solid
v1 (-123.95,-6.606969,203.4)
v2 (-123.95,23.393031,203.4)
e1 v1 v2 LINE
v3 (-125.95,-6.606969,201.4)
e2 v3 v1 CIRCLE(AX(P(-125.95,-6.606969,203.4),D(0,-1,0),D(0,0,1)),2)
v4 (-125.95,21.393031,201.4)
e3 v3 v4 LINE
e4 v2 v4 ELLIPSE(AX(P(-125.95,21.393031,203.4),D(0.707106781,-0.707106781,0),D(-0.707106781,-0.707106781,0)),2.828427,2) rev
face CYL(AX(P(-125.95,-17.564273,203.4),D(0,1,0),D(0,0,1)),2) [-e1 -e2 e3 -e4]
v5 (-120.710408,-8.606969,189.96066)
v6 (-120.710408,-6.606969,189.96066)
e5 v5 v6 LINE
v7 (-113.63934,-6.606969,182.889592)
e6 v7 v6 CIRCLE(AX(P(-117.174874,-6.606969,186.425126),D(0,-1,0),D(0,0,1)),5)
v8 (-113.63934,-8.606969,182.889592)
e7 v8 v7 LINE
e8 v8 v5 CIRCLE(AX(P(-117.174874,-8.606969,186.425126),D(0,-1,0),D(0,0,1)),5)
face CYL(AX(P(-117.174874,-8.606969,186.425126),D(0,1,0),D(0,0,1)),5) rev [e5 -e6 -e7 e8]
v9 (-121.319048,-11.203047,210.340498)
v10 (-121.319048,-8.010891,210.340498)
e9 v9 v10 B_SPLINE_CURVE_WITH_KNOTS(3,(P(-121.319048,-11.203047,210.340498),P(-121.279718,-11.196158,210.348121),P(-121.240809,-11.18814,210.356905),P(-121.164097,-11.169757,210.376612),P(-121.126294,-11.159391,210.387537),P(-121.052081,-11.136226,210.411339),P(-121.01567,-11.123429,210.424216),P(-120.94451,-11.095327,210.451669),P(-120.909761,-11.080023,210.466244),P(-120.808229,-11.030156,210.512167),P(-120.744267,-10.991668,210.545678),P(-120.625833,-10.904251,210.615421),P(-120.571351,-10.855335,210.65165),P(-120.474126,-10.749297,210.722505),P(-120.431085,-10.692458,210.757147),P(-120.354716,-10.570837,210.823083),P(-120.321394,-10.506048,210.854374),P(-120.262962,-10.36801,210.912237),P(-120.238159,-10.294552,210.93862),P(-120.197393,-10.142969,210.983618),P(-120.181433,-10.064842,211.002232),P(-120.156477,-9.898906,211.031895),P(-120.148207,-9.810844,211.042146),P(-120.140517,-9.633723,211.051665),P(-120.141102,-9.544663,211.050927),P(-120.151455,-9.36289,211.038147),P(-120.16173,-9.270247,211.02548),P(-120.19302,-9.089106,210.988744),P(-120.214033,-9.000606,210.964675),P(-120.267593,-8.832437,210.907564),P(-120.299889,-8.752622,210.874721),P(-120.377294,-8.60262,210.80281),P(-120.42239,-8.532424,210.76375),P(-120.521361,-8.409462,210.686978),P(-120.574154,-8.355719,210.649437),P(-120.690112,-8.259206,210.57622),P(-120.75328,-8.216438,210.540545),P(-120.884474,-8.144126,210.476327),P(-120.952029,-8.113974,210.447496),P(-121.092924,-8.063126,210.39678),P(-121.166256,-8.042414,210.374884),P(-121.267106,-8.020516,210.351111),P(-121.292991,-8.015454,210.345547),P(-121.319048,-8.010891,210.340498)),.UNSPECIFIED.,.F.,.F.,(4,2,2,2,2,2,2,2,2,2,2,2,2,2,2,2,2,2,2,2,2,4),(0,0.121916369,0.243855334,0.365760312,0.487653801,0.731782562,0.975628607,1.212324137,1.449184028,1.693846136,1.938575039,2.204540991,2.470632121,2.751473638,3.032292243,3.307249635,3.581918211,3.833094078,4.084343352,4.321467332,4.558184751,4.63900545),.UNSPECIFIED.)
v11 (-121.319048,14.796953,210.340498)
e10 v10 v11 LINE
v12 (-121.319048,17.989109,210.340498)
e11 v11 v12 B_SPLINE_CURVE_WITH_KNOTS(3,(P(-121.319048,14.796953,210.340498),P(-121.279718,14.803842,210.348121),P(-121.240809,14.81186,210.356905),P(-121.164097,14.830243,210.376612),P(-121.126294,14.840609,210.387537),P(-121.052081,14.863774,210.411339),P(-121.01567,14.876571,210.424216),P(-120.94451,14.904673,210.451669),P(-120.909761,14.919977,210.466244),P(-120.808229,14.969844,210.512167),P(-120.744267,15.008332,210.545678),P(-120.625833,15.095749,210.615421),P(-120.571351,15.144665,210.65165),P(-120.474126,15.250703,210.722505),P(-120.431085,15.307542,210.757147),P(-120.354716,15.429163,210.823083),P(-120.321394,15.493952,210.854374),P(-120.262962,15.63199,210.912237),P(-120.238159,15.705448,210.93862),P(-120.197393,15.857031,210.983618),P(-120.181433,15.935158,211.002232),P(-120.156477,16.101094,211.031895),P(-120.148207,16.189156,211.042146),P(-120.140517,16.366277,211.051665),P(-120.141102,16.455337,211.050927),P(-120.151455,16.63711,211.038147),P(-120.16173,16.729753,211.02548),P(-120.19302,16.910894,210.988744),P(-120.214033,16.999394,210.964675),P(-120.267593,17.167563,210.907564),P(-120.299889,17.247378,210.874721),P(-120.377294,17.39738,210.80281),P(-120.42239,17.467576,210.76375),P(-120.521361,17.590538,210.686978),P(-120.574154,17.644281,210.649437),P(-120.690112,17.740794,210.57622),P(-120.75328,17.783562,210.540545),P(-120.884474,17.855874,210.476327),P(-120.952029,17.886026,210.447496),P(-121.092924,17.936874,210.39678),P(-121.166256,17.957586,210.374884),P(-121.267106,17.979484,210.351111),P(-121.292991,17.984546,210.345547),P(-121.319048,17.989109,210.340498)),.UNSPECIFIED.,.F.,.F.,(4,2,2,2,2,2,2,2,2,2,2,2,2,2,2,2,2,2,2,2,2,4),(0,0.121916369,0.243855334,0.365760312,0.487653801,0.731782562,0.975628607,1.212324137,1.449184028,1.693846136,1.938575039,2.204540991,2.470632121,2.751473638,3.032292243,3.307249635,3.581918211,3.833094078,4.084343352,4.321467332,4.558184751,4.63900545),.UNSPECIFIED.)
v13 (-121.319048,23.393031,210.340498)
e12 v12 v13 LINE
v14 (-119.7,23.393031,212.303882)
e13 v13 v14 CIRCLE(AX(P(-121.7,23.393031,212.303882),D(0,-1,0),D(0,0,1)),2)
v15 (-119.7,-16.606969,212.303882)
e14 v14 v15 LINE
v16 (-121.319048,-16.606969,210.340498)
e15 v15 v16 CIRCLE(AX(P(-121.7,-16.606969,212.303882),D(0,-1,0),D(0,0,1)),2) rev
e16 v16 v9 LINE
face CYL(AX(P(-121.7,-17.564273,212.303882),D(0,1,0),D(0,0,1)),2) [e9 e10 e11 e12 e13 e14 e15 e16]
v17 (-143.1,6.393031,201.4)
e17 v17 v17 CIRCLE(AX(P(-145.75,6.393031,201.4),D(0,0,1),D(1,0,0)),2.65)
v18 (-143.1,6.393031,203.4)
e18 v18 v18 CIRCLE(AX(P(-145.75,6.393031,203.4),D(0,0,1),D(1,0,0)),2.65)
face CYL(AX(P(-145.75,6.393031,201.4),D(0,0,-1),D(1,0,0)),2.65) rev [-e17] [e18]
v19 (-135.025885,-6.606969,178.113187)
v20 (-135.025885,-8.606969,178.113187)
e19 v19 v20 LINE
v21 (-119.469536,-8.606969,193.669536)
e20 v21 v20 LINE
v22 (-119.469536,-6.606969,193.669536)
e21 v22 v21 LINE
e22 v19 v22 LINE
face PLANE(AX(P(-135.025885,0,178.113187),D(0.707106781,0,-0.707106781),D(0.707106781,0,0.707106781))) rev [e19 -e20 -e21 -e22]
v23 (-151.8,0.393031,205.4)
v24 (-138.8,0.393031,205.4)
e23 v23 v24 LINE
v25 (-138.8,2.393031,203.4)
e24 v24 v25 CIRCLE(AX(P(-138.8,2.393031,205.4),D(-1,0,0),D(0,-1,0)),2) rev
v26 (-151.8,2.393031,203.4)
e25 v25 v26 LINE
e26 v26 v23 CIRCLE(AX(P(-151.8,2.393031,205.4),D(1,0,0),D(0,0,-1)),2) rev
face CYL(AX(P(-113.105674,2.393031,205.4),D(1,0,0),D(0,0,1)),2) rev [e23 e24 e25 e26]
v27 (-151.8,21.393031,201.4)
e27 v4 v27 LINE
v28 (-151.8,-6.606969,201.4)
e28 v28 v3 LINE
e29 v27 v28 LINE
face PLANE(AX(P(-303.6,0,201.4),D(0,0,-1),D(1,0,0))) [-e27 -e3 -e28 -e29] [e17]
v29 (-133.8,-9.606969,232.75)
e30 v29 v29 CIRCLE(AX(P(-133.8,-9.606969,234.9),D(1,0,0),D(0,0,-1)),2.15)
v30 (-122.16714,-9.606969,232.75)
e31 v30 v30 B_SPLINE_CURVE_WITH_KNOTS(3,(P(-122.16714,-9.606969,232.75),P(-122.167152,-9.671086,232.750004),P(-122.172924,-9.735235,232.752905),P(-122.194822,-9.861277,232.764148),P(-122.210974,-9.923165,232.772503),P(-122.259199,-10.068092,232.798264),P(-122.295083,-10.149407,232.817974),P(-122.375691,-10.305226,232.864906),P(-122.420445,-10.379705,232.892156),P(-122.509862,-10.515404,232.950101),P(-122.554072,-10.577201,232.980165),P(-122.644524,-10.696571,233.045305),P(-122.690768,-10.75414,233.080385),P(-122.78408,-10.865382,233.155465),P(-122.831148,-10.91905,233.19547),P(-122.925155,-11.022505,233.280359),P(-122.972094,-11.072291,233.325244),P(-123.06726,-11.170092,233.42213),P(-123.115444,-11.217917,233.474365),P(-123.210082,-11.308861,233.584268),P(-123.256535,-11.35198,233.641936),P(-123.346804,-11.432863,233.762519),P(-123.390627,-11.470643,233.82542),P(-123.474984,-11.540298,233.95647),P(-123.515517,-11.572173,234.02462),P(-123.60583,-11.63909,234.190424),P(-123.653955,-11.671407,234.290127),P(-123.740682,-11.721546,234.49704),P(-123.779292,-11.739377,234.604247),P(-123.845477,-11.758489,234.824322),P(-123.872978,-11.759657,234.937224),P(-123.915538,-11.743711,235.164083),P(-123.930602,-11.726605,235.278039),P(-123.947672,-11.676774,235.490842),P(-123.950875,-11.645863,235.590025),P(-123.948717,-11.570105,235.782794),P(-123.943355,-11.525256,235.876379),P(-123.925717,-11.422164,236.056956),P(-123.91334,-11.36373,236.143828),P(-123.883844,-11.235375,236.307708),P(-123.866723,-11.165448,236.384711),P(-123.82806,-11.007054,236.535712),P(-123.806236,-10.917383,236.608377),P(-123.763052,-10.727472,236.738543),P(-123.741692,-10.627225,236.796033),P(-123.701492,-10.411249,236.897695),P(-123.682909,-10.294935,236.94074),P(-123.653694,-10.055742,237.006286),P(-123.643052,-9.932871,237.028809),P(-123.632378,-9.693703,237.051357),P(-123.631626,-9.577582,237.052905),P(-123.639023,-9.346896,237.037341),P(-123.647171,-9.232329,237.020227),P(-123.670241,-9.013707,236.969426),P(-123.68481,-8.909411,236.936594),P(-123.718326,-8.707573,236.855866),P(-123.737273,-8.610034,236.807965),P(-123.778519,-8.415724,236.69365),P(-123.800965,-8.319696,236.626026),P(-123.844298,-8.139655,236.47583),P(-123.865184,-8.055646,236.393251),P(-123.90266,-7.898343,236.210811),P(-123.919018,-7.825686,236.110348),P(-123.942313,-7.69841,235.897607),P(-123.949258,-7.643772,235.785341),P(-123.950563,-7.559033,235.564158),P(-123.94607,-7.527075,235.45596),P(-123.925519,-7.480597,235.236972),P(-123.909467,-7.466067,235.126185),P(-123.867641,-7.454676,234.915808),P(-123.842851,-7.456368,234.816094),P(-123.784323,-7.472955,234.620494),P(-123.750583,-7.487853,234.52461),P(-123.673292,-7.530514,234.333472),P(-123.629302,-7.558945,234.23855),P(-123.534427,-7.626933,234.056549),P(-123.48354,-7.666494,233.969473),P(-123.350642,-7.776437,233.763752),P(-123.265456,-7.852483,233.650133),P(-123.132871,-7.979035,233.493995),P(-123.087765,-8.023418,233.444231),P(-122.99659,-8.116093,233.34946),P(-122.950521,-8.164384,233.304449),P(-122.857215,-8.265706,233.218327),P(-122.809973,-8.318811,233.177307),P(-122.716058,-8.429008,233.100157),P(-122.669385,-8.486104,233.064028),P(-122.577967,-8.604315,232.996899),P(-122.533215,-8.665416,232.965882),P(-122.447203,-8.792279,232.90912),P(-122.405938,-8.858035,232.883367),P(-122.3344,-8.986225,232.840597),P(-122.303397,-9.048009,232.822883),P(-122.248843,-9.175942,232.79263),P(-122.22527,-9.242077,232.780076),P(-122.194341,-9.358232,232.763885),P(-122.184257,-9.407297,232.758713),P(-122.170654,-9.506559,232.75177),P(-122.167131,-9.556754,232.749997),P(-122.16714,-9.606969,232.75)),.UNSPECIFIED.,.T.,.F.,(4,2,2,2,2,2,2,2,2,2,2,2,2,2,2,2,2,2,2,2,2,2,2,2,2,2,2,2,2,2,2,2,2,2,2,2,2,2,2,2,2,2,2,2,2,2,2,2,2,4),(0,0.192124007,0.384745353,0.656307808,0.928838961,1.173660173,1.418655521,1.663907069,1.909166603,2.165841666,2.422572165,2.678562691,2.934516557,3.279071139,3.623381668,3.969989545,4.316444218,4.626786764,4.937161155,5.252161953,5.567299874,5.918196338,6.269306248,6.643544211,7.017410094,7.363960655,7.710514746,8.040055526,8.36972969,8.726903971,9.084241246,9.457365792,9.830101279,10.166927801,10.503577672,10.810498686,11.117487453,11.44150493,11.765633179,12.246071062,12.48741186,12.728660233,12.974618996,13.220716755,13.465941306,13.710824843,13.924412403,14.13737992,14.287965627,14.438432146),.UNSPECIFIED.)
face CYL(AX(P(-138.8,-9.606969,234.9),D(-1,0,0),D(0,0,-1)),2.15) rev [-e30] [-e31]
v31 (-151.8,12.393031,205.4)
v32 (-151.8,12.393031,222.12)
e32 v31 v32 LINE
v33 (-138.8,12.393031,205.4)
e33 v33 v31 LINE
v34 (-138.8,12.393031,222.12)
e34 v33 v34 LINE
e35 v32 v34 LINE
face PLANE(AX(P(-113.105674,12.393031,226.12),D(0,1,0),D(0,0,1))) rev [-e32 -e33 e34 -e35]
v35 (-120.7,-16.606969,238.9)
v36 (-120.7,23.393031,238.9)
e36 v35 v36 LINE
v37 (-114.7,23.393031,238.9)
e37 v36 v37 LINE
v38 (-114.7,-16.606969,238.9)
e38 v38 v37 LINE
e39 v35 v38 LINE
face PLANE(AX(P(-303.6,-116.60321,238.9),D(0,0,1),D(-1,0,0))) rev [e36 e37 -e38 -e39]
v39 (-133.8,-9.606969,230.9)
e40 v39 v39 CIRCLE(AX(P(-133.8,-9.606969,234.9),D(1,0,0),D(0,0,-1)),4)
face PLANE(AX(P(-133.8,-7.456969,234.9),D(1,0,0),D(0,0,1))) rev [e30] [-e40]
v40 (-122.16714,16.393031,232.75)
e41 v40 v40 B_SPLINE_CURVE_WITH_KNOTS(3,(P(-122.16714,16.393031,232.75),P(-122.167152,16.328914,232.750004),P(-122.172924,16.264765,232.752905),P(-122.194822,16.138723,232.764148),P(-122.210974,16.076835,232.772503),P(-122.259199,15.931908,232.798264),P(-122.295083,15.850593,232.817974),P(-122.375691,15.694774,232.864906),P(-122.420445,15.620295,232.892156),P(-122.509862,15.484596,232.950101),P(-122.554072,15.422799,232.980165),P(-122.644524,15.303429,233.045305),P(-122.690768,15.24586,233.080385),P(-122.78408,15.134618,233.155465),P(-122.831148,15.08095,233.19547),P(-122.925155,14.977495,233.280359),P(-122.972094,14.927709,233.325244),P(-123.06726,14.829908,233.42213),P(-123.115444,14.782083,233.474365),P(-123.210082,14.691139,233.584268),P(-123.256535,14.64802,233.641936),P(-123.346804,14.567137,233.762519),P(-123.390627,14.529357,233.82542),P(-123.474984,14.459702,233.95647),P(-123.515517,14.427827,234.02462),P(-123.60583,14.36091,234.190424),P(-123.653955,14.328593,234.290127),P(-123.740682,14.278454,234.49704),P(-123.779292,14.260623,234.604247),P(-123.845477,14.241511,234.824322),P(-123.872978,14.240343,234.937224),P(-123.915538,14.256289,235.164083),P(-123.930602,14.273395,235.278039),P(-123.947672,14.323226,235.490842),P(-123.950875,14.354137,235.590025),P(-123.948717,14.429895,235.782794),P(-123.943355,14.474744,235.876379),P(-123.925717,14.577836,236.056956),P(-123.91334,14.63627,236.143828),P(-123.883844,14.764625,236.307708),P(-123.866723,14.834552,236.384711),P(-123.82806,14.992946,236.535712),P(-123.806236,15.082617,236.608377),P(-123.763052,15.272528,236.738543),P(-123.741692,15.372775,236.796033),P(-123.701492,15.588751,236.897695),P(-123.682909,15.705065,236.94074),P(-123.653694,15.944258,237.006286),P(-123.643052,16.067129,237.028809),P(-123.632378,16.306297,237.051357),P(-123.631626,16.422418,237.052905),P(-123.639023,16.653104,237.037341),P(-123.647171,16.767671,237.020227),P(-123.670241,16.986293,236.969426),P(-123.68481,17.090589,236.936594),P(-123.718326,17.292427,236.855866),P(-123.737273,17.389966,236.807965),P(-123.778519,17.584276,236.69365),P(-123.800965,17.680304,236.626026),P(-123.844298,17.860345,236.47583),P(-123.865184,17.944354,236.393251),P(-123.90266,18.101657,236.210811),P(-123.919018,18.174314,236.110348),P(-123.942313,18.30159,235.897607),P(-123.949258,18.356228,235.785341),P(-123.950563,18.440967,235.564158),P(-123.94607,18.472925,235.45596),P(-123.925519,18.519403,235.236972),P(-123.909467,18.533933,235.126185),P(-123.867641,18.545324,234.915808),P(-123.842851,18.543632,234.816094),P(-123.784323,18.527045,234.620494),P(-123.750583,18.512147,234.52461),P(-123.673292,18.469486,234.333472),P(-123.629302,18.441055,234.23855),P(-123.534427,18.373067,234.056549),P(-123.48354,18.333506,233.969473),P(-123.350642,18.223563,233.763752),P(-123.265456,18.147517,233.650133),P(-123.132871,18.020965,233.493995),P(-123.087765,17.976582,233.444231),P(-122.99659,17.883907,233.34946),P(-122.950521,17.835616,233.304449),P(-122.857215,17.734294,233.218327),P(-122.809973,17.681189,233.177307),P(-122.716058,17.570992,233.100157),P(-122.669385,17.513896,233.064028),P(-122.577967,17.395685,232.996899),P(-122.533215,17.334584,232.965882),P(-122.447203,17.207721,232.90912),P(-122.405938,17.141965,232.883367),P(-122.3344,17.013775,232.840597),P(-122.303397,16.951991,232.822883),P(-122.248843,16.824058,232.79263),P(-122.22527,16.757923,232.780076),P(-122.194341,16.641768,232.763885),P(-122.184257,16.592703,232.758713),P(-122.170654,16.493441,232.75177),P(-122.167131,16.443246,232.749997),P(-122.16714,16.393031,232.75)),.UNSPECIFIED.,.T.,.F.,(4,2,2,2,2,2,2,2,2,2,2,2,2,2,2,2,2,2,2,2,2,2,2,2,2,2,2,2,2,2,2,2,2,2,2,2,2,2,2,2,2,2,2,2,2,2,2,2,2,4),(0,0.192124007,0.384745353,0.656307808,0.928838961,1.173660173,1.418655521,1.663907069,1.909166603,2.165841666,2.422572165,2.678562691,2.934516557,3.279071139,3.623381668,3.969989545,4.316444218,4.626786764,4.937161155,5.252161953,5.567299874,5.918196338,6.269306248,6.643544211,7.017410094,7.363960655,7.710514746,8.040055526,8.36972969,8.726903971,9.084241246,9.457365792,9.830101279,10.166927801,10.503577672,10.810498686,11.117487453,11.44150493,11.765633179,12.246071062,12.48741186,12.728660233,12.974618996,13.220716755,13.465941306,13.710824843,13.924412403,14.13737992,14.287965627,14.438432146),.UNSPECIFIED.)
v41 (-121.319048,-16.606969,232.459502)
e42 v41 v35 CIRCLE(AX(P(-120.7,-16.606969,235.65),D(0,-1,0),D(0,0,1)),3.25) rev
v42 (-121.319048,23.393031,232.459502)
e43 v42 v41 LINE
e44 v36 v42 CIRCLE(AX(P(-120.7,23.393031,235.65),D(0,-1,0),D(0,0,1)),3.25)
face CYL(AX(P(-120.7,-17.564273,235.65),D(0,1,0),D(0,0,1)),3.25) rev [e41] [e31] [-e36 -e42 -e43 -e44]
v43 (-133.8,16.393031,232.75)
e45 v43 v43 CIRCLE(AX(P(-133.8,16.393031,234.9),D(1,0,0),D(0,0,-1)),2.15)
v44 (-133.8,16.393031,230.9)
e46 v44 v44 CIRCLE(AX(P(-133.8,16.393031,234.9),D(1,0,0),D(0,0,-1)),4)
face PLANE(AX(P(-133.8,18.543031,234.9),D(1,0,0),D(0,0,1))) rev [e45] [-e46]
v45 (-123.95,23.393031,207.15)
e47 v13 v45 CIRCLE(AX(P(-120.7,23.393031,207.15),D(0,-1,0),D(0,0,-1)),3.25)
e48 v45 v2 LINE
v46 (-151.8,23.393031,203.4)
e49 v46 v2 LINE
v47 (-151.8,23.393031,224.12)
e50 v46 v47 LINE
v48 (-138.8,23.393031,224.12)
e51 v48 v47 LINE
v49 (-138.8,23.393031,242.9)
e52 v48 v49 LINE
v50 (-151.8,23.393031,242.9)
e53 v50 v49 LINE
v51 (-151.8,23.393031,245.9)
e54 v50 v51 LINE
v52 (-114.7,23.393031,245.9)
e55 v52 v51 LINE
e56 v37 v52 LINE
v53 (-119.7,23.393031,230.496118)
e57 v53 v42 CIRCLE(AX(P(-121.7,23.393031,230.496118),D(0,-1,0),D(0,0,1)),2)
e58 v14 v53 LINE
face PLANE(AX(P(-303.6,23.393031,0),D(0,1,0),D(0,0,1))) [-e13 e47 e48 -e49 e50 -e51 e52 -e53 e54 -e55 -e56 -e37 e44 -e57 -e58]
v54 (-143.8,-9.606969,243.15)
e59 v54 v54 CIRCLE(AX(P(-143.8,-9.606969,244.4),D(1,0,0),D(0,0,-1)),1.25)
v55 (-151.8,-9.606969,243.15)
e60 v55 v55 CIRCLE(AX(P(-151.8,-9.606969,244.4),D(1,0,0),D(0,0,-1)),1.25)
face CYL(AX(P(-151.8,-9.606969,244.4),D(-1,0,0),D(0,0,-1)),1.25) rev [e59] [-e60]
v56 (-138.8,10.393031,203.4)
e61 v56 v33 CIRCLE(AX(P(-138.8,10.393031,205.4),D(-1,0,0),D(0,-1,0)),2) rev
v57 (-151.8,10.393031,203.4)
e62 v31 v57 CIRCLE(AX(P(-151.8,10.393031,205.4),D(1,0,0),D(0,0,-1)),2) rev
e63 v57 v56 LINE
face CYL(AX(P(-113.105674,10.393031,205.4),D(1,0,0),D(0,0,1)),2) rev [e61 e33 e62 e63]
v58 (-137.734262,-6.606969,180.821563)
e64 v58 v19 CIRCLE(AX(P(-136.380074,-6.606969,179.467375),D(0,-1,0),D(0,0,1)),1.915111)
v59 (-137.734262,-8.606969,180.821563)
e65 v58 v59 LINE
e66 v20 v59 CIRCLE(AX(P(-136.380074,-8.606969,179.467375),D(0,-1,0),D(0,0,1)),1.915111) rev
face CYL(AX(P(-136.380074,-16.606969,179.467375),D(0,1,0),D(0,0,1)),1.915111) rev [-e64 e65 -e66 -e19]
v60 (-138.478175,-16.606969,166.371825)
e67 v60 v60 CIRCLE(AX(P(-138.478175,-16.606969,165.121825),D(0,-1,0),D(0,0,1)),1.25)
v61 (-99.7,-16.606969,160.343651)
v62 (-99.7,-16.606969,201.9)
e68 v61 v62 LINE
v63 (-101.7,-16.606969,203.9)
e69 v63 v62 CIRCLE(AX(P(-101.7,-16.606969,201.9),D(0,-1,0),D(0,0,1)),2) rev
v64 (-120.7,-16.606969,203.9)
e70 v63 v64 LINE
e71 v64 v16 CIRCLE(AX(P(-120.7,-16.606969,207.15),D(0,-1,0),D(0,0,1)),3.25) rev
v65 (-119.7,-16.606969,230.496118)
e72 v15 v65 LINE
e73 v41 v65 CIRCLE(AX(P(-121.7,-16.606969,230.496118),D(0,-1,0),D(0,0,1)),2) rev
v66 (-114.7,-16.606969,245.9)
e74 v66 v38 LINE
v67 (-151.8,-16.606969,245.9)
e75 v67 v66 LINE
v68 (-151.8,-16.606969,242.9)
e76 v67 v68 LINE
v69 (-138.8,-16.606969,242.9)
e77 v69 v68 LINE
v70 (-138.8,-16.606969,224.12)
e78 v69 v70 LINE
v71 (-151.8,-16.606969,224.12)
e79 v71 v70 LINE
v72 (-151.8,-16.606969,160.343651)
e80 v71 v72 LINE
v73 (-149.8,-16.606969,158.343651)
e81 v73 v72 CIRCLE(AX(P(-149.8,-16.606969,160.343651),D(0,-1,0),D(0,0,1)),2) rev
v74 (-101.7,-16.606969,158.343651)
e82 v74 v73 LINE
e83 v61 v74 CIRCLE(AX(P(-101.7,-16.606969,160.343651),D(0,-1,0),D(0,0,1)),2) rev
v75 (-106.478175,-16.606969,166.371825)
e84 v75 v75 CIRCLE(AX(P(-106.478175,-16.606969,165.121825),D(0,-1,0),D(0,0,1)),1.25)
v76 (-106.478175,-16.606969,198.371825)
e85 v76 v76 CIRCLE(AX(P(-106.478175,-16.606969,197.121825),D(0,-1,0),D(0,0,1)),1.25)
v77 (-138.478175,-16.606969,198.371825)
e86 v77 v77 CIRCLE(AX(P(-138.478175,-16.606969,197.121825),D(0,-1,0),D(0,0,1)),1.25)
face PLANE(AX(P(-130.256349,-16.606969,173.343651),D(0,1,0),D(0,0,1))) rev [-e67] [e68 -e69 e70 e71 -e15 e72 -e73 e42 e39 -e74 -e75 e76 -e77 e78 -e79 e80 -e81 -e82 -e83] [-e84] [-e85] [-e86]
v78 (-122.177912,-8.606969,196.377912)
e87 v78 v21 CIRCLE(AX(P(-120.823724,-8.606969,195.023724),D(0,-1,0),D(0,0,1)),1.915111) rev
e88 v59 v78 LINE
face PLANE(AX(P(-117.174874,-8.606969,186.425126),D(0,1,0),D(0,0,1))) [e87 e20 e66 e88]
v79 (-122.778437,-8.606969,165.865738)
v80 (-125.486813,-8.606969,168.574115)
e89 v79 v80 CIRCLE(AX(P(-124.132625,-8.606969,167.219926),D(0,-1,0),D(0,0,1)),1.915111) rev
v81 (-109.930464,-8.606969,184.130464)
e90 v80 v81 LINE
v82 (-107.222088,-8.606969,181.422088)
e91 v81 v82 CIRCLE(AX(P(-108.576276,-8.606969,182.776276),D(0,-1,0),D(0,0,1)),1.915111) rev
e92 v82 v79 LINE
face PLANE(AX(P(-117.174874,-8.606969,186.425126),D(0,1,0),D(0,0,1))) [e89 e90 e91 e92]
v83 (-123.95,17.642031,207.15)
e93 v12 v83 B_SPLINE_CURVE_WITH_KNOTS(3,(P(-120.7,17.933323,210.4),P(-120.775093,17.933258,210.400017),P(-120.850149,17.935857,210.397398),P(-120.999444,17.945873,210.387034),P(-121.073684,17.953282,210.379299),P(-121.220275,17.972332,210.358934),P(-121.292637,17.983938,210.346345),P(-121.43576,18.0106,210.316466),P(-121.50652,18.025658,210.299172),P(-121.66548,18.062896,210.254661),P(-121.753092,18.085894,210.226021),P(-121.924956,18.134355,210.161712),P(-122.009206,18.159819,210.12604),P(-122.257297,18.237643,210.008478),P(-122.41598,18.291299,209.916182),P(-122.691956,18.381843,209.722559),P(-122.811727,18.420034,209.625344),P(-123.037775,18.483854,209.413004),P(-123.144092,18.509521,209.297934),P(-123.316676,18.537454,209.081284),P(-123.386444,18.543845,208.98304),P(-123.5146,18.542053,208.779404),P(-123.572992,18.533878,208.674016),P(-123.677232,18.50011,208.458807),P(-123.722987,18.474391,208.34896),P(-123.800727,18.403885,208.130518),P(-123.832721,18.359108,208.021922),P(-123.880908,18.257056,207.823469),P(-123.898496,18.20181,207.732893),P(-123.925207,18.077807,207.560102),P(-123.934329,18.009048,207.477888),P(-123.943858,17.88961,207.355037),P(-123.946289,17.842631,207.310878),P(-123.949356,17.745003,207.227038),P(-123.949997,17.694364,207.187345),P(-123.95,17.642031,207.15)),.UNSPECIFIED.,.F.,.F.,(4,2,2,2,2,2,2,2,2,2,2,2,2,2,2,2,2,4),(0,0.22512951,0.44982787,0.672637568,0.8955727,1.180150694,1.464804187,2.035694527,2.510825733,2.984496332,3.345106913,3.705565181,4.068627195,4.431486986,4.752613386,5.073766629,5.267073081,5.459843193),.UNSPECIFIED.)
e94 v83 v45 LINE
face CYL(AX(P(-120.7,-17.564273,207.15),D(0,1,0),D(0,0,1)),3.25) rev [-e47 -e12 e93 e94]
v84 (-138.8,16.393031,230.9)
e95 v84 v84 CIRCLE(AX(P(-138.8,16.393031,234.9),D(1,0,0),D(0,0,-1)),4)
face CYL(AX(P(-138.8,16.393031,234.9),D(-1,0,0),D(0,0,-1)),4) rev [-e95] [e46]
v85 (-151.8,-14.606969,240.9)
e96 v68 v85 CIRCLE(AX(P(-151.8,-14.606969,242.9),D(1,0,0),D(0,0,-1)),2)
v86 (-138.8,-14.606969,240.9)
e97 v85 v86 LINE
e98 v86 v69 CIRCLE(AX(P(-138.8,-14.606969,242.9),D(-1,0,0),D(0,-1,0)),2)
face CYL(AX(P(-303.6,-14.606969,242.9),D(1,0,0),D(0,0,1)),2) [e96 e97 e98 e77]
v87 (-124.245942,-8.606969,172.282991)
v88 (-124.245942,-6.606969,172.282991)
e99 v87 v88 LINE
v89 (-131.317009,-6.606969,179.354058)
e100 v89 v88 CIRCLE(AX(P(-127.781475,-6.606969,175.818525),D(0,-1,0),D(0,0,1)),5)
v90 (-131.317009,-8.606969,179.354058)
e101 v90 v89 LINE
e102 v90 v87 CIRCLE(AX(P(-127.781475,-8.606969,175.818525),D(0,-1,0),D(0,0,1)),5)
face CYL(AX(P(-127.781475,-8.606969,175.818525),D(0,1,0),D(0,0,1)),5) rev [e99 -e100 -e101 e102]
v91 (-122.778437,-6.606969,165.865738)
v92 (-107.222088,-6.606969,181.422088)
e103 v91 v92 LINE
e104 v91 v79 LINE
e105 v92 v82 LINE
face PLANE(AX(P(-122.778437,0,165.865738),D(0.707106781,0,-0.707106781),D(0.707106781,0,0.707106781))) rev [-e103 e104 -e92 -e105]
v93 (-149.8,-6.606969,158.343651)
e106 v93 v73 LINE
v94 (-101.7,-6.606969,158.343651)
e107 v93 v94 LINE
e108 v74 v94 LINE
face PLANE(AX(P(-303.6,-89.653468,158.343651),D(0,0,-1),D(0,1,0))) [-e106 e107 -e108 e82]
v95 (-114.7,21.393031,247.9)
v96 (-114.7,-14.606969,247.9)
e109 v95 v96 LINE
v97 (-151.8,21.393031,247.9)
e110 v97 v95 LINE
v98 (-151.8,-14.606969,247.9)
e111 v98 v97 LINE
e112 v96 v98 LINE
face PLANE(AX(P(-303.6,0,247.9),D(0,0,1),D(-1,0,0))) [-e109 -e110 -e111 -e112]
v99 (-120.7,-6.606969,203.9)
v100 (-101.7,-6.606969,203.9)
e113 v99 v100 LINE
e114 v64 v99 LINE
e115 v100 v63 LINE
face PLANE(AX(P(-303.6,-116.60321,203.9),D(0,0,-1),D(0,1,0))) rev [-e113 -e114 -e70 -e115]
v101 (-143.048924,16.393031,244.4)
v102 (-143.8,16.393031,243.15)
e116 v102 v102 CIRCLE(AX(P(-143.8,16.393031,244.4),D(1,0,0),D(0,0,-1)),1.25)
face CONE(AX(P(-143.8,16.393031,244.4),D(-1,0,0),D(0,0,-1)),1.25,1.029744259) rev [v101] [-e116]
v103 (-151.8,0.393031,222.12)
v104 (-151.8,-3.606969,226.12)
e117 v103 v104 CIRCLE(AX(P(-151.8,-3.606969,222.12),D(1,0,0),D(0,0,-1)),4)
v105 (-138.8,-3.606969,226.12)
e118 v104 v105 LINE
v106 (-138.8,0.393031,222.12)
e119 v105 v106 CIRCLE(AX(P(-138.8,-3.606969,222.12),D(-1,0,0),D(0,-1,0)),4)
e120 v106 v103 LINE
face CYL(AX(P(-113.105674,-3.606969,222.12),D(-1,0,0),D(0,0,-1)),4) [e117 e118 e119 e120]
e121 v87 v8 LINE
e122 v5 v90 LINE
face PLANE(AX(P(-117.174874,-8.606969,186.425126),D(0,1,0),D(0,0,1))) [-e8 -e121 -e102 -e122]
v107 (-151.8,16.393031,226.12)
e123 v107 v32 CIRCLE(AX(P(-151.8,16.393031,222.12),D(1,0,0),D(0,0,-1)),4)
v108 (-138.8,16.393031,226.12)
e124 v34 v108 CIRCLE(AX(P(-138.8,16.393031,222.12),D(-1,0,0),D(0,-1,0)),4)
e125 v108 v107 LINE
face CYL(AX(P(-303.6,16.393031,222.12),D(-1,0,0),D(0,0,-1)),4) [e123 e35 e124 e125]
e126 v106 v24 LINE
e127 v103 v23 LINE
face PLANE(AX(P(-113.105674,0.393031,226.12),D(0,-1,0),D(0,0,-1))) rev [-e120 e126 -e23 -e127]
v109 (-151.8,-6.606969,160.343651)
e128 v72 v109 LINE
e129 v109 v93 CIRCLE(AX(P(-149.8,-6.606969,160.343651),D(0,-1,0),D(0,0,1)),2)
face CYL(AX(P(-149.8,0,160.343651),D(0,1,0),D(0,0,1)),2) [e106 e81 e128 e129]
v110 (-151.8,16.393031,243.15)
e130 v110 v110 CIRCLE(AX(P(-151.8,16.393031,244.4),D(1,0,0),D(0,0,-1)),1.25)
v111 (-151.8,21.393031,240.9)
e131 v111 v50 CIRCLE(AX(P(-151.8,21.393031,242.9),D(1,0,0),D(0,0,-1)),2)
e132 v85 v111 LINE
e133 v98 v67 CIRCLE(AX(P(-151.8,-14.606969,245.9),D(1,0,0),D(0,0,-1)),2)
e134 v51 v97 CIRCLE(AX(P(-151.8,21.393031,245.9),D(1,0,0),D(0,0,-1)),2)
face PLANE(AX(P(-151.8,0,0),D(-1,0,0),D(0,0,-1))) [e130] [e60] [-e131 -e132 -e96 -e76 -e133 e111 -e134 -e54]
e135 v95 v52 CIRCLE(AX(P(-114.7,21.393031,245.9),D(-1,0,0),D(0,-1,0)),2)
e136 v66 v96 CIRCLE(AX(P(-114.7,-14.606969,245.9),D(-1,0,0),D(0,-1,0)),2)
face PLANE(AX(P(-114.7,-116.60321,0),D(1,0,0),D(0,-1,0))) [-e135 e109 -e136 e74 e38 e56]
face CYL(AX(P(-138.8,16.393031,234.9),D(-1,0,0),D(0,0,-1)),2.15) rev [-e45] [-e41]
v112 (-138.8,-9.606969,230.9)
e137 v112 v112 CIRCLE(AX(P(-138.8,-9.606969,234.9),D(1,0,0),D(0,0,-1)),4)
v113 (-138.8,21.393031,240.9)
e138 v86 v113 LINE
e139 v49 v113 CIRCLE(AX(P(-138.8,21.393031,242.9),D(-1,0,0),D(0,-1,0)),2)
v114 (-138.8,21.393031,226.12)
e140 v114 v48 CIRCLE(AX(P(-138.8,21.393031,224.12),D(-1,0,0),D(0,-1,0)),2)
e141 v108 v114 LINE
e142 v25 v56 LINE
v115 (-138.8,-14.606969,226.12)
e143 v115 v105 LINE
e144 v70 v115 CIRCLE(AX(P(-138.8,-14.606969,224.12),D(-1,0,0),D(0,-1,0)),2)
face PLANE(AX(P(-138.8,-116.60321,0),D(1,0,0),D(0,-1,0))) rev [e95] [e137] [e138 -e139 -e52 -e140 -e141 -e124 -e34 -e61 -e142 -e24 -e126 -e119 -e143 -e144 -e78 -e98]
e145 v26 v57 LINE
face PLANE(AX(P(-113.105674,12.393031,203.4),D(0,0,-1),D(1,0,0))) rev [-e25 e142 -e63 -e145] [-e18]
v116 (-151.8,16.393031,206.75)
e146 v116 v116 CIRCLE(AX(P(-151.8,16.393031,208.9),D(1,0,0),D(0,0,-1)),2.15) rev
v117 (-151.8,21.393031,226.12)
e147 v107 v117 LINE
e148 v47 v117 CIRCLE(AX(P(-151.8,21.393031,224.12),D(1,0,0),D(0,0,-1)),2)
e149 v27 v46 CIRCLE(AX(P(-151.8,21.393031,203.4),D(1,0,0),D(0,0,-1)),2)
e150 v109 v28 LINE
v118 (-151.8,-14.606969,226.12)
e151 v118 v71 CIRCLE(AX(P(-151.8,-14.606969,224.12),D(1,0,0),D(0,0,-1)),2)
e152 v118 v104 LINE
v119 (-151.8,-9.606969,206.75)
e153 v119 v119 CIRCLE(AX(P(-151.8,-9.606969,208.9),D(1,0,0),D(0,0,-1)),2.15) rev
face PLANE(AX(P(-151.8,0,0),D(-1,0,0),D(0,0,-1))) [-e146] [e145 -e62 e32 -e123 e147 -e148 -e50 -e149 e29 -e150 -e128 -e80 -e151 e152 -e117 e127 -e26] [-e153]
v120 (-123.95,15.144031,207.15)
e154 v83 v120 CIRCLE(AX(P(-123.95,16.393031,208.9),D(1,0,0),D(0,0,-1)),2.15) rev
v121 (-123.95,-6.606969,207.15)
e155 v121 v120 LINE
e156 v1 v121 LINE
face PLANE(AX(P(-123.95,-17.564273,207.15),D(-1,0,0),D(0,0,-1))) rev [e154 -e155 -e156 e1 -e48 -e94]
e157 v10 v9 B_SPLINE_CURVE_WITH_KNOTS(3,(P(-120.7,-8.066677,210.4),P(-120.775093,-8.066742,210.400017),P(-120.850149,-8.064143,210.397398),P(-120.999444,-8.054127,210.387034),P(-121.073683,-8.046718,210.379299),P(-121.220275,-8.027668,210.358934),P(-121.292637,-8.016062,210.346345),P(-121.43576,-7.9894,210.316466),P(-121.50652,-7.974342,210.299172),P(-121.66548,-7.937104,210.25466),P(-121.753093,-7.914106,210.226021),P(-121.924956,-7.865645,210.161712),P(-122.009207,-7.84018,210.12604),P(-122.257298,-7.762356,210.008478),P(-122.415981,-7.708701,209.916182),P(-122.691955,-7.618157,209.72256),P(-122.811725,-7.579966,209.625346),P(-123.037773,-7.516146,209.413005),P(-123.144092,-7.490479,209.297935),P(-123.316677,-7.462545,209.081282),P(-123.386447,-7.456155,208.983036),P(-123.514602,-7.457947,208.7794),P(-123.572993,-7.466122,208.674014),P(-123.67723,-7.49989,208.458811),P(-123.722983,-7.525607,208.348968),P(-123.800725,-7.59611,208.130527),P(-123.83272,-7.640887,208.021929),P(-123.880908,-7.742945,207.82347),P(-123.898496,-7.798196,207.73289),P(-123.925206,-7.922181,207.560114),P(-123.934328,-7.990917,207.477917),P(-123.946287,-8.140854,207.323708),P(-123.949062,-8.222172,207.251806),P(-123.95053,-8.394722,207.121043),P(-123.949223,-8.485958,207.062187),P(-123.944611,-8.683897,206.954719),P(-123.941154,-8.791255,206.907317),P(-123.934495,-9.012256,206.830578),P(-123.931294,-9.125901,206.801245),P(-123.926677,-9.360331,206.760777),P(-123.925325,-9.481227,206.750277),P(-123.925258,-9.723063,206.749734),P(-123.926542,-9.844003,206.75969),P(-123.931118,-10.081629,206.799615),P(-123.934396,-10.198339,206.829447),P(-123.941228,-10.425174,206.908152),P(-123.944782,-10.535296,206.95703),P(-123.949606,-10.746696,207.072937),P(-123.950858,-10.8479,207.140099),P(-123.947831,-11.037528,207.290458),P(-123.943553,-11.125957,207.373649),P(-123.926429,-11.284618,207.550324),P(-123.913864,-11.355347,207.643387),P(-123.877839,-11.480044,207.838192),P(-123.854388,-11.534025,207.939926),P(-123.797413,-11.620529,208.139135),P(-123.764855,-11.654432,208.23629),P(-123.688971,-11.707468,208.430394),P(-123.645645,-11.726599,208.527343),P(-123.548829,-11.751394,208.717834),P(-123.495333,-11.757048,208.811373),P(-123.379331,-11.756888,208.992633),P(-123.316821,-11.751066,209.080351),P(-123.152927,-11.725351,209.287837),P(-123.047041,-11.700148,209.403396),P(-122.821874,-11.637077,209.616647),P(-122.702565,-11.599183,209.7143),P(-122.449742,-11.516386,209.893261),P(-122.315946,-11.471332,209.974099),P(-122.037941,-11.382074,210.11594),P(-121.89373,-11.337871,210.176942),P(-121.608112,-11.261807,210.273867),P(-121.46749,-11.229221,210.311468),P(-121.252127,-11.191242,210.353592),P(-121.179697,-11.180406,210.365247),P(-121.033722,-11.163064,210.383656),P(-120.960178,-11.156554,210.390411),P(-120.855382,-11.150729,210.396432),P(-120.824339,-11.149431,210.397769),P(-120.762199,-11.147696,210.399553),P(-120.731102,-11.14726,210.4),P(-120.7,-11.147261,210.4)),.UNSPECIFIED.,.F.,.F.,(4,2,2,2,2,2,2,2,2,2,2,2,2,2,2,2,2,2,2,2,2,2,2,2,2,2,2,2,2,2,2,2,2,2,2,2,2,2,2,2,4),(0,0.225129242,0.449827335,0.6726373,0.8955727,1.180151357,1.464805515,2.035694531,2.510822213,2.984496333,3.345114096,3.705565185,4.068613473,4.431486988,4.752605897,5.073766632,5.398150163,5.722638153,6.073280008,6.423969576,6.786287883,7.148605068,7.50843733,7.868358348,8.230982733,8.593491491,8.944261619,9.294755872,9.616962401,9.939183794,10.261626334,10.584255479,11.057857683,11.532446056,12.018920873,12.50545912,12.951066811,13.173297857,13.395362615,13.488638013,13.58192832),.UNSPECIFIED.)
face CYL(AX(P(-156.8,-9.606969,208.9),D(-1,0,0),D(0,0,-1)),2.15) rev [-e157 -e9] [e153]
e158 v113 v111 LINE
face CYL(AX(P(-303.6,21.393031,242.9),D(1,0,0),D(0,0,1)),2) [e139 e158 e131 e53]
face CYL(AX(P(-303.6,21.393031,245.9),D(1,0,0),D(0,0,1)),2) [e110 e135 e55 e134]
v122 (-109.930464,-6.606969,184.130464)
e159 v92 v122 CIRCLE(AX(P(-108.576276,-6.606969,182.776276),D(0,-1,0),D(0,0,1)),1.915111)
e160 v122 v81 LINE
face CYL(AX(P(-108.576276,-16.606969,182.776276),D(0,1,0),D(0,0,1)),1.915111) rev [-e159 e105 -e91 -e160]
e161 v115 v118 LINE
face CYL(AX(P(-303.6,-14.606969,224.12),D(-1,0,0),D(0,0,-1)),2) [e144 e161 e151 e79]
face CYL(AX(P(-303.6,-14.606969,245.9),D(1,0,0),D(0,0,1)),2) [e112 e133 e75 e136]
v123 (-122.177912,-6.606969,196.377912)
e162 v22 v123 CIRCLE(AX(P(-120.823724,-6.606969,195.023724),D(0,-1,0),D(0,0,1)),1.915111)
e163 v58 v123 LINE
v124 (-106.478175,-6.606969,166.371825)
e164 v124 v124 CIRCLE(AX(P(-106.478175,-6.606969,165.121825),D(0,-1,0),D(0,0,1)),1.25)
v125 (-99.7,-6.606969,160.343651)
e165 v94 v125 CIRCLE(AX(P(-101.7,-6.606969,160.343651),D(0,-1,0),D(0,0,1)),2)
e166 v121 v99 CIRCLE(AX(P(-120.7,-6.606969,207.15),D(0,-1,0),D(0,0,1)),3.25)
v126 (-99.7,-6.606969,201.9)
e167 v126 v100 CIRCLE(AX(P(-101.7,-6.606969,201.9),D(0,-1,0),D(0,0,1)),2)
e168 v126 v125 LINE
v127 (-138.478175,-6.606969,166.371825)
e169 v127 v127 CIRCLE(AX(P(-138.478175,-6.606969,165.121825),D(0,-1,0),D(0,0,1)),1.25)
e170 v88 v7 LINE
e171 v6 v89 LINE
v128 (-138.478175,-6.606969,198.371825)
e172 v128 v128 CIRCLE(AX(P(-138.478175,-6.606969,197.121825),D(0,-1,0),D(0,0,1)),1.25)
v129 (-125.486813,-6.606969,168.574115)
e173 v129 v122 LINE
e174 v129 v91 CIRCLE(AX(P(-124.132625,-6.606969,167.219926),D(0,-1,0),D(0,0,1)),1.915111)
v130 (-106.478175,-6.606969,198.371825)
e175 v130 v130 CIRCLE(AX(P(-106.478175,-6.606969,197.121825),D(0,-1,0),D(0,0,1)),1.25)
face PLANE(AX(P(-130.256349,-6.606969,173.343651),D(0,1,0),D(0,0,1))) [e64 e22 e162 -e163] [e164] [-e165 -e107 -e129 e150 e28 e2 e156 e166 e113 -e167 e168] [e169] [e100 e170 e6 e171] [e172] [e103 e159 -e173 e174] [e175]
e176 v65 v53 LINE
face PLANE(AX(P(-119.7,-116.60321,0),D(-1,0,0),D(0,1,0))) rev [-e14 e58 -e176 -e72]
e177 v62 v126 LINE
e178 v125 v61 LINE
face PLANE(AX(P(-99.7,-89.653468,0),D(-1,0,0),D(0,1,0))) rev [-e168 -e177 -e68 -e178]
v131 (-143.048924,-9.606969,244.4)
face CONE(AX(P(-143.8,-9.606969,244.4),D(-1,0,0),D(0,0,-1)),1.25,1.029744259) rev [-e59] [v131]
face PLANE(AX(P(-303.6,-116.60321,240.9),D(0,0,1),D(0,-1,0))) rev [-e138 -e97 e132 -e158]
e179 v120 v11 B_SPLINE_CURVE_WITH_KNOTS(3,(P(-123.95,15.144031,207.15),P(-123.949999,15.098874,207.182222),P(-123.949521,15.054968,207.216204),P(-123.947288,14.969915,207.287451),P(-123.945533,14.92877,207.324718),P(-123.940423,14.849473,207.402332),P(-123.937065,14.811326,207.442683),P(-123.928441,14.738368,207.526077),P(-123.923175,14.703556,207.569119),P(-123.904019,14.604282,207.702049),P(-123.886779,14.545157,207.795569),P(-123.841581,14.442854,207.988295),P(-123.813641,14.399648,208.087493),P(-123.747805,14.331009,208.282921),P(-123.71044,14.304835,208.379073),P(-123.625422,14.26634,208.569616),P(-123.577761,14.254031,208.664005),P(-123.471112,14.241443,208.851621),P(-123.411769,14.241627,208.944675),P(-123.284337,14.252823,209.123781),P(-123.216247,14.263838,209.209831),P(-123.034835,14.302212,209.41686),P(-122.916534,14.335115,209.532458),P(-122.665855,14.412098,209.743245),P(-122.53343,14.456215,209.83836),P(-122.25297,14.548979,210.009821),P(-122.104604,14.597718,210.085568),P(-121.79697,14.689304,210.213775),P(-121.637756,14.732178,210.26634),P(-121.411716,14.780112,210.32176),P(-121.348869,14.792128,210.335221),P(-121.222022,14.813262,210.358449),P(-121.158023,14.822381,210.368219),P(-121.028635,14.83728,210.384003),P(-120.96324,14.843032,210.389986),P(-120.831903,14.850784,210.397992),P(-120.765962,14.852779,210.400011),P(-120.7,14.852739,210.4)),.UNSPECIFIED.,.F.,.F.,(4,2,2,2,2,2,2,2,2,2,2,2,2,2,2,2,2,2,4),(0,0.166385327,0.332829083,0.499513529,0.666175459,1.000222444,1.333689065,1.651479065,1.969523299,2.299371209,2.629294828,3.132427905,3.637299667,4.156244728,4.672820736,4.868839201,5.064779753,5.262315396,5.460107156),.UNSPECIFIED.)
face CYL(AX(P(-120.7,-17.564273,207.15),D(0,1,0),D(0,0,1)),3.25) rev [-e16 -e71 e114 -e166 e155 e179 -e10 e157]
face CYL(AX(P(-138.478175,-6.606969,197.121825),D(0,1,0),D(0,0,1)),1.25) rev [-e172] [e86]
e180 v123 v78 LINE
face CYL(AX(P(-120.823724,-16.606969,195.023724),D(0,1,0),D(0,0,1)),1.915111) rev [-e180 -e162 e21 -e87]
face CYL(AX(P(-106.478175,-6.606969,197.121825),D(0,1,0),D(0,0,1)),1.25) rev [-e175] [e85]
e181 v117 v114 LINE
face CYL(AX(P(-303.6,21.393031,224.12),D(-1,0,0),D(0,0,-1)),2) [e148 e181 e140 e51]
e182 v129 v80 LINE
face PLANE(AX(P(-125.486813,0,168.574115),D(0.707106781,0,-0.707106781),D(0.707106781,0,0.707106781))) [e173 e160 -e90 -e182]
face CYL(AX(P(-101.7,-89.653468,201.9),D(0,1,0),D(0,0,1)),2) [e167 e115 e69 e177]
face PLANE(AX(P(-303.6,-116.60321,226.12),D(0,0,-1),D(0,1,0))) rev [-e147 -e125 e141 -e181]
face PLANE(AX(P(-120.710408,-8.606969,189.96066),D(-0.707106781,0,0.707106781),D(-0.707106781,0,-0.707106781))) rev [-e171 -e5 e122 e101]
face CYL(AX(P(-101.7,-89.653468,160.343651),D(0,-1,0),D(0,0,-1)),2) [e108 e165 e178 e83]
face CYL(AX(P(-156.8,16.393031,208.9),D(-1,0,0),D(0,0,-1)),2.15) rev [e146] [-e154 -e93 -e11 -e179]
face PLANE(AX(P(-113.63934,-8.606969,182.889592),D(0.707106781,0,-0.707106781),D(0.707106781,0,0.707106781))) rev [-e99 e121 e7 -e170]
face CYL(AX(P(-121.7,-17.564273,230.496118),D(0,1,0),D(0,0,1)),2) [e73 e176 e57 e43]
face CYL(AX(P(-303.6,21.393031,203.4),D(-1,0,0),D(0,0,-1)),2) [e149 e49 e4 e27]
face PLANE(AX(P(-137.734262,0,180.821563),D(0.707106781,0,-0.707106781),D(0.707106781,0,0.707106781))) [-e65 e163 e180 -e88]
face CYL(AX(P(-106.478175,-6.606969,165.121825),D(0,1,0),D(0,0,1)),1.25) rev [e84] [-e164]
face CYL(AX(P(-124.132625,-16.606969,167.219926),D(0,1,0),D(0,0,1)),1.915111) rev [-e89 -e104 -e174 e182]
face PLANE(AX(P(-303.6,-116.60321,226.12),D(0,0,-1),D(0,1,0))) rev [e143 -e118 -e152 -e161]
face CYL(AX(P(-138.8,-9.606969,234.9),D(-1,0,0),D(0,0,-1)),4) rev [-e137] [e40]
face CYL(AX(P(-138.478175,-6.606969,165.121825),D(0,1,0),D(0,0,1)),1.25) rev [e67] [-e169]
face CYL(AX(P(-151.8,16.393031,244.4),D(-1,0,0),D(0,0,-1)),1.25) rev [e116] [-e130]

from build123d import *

# Parameters (mm, degrees)
SKETCH3_W                       = 13.49028586
SKETCH3_H                       = 10
BOSS_EXTRUDE1_DEPTH             = 22
SKETCH3_W_2                     = 3
BOSS_EXTRUDE1_2_DEPTH           = 22
BOSS_EXTRUDE1_3_DEPTH           = 22
SKETCH4_W                       = 27.150730292
SKETCH4_H                       = 10
BOSS_EXTRUDE2_DEPTH             = 3
SKETCH5_W                       = 27.150730292
SKETCH5_H                       = 10
BOSS_EXTRUDE3_DEPTH             = 3
SKETCH7_W                       = 13
SKETCH7_H                       = 14.78
BOSS_EXTRUDE4_DEPTH             = 10
BOSS_EXTRUDE5_DEPTH             = 10
SKETCH15_R                      = 1.915111108
CUT_EXTRUDE4_DEPTH              = 320.596652048
SKETCH18_W                      = 13
SKETCH18_H                      = 14.78
BOSS_EXTRUDE6_DEPTH             = 30
M4_CLEARANCE_HOLE1_D            = 4.3
CUT_EXTRUDE7_DEPTH              = 5
CUT_EXTRUDE6_DEPTH              = 2
TAP_DRILL_FOR_M3X0_5_TAP1_D     = 2.5
SKETCH43_W                      = 32.1
SKETCH43_H                      = 30
BOSS_EXTRUDE9_DEPTH             = 2.5
SKETCH27_W                      = 22.72
SKETCH27_H                      = 12
CUT_EXTRUDE9_DEPTH              = 13
FILLET1_R                       = 2
FILLET2_R                       = 4
CBORE_FOR_M4_SHCS1_D            = 4.3
CBORE_FOR_M4_SHCS1_CBORE_D      = 8
CBORE_FOR_M4_SHCS1_CBORE_DEPTH  = 5
SKETCH31_W                      = 37.1
SKETCH31_H                      = 40
BOSS_EXTRUDE8_DEPTH             = 2
TAP_DRILL_FOR_M3X0_5_TAP2_D     = 2.5
TAP_DRILL_FOR_M3X0_5_TAP2_DEPTH = 8
TAP_DRILL_FOR_M3X0_5_TAP2_TIP   = 0.751075774
FILLET4_R                       = 2
CUT_EXTRUDE10_REACH             = 325.465
CUT_EXTRUDE12_DEPTH             = 10
FILLET5_R                       = 2
M5_CLEARANCE_HOLE1_D            = 5.3
M5_CLEARANCE_HOLE1_DEPTH        = 2
BOSS_EXTRUDE10_START            = -8
BOSS_EXTRUDE10_DEPTH            = 8


with BuildPart() as part:
    # Sketch3 → Boss-Extrude1 (new body)
    with BuildSketch(Plane(origin=(-188.9, 0, 188.9), x_dir=(0.7071067811865475, 0, 0.7071067811865477), z_dir=(-0.7071067811865477, 0, 0.7071067811865475))):
        with Locations((0, -11.606969024)):
            Rectangle(SKETCH3_W, SKETCH3_H)
    extrude(amount=-BOSS_EXTRUDE1_DEPTH)



with BuildPart() as body_2:
    # Sketch3 → Boss-Extrude1 2 (new body)
    with BuildSketch(Plane(origin=(-188.9, 0, 188.9), x_dir=(0.7071067811865475, 0, 0.7071067811865477), z_dir=(-0.7071067811865477, 0, 0.7071067811865475))):
        with Locations((12.075365146, -11.606969024)):
            Rectangle(SKETCH3_W_2, SKETCH3_H)
    extrude(amount=-BOSS_EXTRUDE1_2_DEPTH)


with BuildPart() as body_3:
    # Sketch3 → Boss-Extrude1 3 (new body)
    with BuildSketch(Plane(origin=(-188.9, 0, 188.9), x_dir=(0.7071067811865475, 0, 0.7071067811865477), z_dir=(-0.7071067811865477, 0, 0.7071067811865475))):
        with Locations((-12.075365146, -11.606969024)):
            Rectangle(SKETCH3_W_2, SKETCH3_H)
    extrude(amount=-BOSS_EXTRUDE1_3_DEPTH)


with BuildPart() as part_1:
    add(part.part)

    add(body_2.part)  # Boss-Extrude2 merges body 2

    add(body_3.part)  # Boss-Extrude2 merges body 3
    # Sketch4 → Boss-Extrude2 (add)
    with BuildSketch(Plane(origin=(-188.9, 0, 188.9), x_dir=(0.7071067811865472, 0, 0.7071067811865479), z_dir=(-0.7071067811865479, 0, 0.7071067811865472))):
        with Locations((0, -11.606969024)):
            Rectangle(SKETCH4_W, SKETCH4_H)
    extrude(amount=BOSS_EXTRUDE2_DEPTH)

    # Sketch5 → Boss-Extrude3 (add)
    with BuildSketch(Plane(origin=(-173.343650814, 0, 173.343650814), x_dir=(-0.7071067811865472, 0, -0.7071067811865479), z_dir=(0.7071067811865479, 0, -0.7071067811865472))):
        with Locations((0, -11.606969024)):
            Rectangle(SKETCH5_W, SKETCH5_H)
    extrude(amount=BOSS_EXTRUDE3_DEPTH)

    # Sketch7 → Boss-Extrude4 (add)
    with BuildSketch(Plane(origin=(0, -6.606969024, 0), x_dir=(1, 0, 0), z_dir=(0, 1, 0))):
        Polygon((-183.9, -238.9), (-188.9, -238.9), (-188.9, -245.9), (-146.8, -245.9), (-146.8, -161.623097719), (-180.821563222, -161.623097719), (-161.623097719, -180.821563222), (-181.422087592, -200.620553095), (-200.620553095, -181.422087592), (-200.620553095, -203.9), (-183.9, -203.9), align=None)
        with Locations((-158.3, -233.51)):
            Rectangle(SKETCH7_W, SKETCH7_H, mode=Mode.SUBTRACT)
    extrude(amount=-BOSS_EXTRUDE4_DEPTH)

    # Sketch13 → Boss-Extrude5 (add)
    with BuildSketch(Plane(origin=(0, -6.606969024, 0), x_dir=(1, 0, 0), z_dir=(0, 1, 0))):
        Polygon((-203.9, -203.9), (-200.620553095, -203.9), (-200.620553095, -181.422087592), (-180.821563222, -161.623097719), (-146.8, -161.623097719), (-146.8, -158.343650814), (-203.9, -158.343650814), align=None)
    extrude(amount=-BOSS_EXTRUDE5_DEPTH)

    # Sketch15 → Cut-Extrude4 (cut, through all)
    with BuildSketch(Plane(origin=(0, -6.606969024, 0), x_dir=(1, 0, 0), z_dir=(0, 1, 0))):
        with Locations((-179.467375171, -167.219926457)):
            Circle(SKETCH15_R)
        with Locations((-167.219926457, -179.467375171)):
            Circle(SKETCH15_R)
        with Locations((-195.023724357, -182.776275643)):
            Circle(SKETCH15_R)
        with Locations((-182.776275643, -195.023724357)):
            Circle(SKETCH15_R)
    extrude(amount=-CUT_EXTRUDE4_DEPTH, mode=Mode.SUBTRACT)

    # Sketch18 → Boss-Extrude6 (add)
    with BuildSketch(Plane(origin=(0, -6.606969024, 0), x_dir=(1, 0, 0), z_dir=(0, 1, 0))):
        Polygon((-183.9, -203.9), (-146.8, -203.9), (-146.8, -245.9), (-188.9, -245.9), (-188.9, -238.9), (-183.9, -238.9), align=None)
        with Locations((-158.3, -233.51)):
            Rectangle(SKETCH18_W, SKETCH18_H, mode=Mode.SUBTRACT)
    extrude(amount=BOSS_EXTRUDE6_DEPTH)

    # M4 Clearance Hole1 (through all)
    with Locations(Plane(origin=(-146.8, 0, 0), x_dir=(0, 0, -1), z_dir=(1, 0, 0))):
        with Locations((-208.9, 16.393030976), (-208.9, -9.606969024)):
            Hole(M4_CLEARANCE_HOLE1_D / 2)

    # Sketch22 → Cut-Extrude7 (cut)
    with BuildSketch(Plane(origin=(-146.8, 0, 0), x_dir=(0, 0, -1), z_dir=(1, 0, 0))):
        Polygon((-245.9, 23.393030976), (-245.9, -16.606969024), (-158.343650814, -16.606969024), (-158.343650814, -6.606969024), (-203.9, -6.606969024), (-203.9, 23.393030976), align=None)
    extrude(amount=-CUT_EXTRUDE7_DEPTH, mode=Mode.SUBTRACT)

    # Sketch17 → Cut-Extrude6 (cut)
    with BuildSketch(Plane(origin=(0, -6.606969024, 0), x_dir=(1, 0, 0), z_dir=(0, 1, 0))):
        with BuildLine():
            Line((-189.960660172, -182.88959236), (-179.354058454, -172.282990642))
            ThreePointArc((-179.354058454, -172.282990642), (-172.282990642, -172.282990642), (-172.282990642, -179.354058454))
            Line((-172.282990642, -179.354058454), (-182.88959236, -189.960660172))
            ThreePointArc((-182.88959236, -189.960660172), (-189.960660172, -189.960660172), (-189.960660172, -182.88959236))
        make_face()
    extrude(amount=-CUT_EXTRUDE6_DEPTH, mode=Mode.SUBTRACT)

    # Tap Drill for M3x0.5 Tap1 (through all)
    with Locations(Plane(origin=(0, -6.606969024, 0), x_dir=(1, 0, 0), z_dir=(0, 1, 0))):
        with Locations((-197.121825407, -165.121825407), (-165.121825407, -197.121825407), (-197.121825407, -197.121825407), (-165.121825407, -165.121825407)):
            Hole(TAP_DRILL_FOR_M3X0_5_TAP1_D / 2)

    # Sketch43 → Boss-Extrude9 (add)
    with BuildSketch(Plane(origin=(0, 0, 203.9), x_dir=(-1, 0, 0), z_dir=(0, 0, -1))):
        with Locations((167.85, 8.393030976)):
            Rectangle(SKETCH43_W, SKETCH43_H)
    extrude(amount=BOSS_EXTRUDE9_DEPTH)

    # Sketch27 → Cut-Extrude9 (cut)
    with BuildSketch(Plane(origin=(-151.8, 0, 0), x_dir=(0, 0, -1), z_dir=(1, 0, 0))):
        with Locations((-214.76, 6.393030976)):
            Rectangle(SKETCH27_W, SKETCH27_H)
    extrude(amount=-CUT_EXTRUDE9_DEPTH, mode=Mode.SUBTRACT)

    # Fillet1
    fillet1_edges = [part_1.edges().sort_by_distance(p)[0] for p in [
        (-158.3, 0.393030976, 203.4),
        (-158.3, 12.393030976, 203.4),
    ]]
    fillet(fillet1_edges, radius=FILLET1_R)

    # Fillet2
    fillet2_edges = [part_1.edges().sort_by_distance(p)[0] for p in [
        (-158.3, 12.393030976, 226.12),
        (-158.3, 0.393030976, 226.12),
    ]]
    fillet(fillet2_edges, radius=FILLET2_R)

    # CBORE for M4 SHCS1 (through all)
    with Locations(Plane(origin=(-164.8, 0, 0), x_dir=(0, 0, -1), z_dir=(1, 0, 0))):
        with Locations((-234.9, 16.393030976), (-234.9, -9.606969024)):
            CounterBoreHole(CBORE_FOR_M4_SHCS1_D / 2, CBORE_FOR_M4_SHCS1_CBORE_D / 2, CBORE_FOR_M4_SHCS1_CBORE_DEPTH)

    # Sketch31 → Boss-Extrude8 (add)
    with BuildSketch(Plane.XY.offset(245.9)):
        with Locations((-170.35, 3.393030976)):
            Rectangle(SKETCH31_W, SKETCH31_H)
    extrude(amount=BOSS_EXTRUDE8_DEPTH)

    # Tap Drill for M3x0.5 Tap2
    with Locations(Plane(origin=(-151.8, 0, 0), x_dir=(0, 0, -1), z_dir=(1, 0, 0))):
        with Locations((-244.4, 16.393030976), (-244.4, -9.606969024)):
            Hole(TAP_DRILL_FOR_M3X0_5_TAP2_D / 2, depth=TAP_DRILL_FOR_M3X0_5_TAP2_DEPTH)
            with Locations((0, 0, -(TAP_DRILL_FOR_M3X0_5_TAP2_DEPTH + TAP_DRILL_FOR_M3X0_5_TAP2_TIP / 2))):  # 118° drill point
                Cone(0, TAP_DRILL_FOR_M3X0_5_TAP2_D / 2, TAP_DRILL_FOR_M3X0_5_TAP2_TIP, mode=Mode.SUBTRACT)

    # Fillet4
    fillet4_edges = [part_1.edges().sort_by_distance(p)[0] for p in [
        (-158.3, -16.606969024, 226.12),
        (-203.9, -11.606969024, 203.9),
        (-203.9, -11.606969024, 158.343650814),
        (-158.3, 23.393030976, 226.12),
        (-158.3, 23.393030976, 240.9),
        (-151.8, -11.606969024, 158.343650814),
        (-167.85, 23.393030976, 201.4),
        (-170.35, -16.606969024, 247.9),
        (-170.35, 23.393030976, 247.9),
        (-158.3, -16.606969024, 240.9),
    ]]
    fillet(fillet4_edges, radius=FILLET4_R)

    # Cut-Extrude10: up to this face of the body (flat: up to its plane)
    cut_extrude10_end = Plane(part_1.part.faces().sort_by_distance((-177.85, -6.606969024, 159.03573397))[0])
    # Sketch36 → Cut-Extrude10 (cut, up to the picked face)
    with BuildSketch(Plane(origin=(0, 23.393030976, 0), x_dir=(1, 0, 0), z_dir=(0, 1, 0)), mode=Mode.PRIVATE) as cut_extrude10_sk1:
        with BuildLine():
            Line((-182.9, -232.4), (-183.9, -232.4))
            Line((-183.9, -232.4), (-183.9, -238.9))
            Line((-183.9, -238.9), (-182.9, -238.9))
            ThreePointArc((-182.9, -238.9), (-179.65, -235.65), (-182.9, -232.4))
        make_face()
    cut_extrude10_tool1 = split(extrude(cut_extrude10_sk1.sketch, amount=-CUT_EXTRUDE10_REACH, mode=Mode.PRIVATE), bisect_by=cut_extrude10_end, keep=Keep.BOTH, mode=Mode.PRIVATE)
    # Sketch36 → Cut-Extrude10 (cut, up to the picked face)
    with BuildSketch(Plane(origin=(0, 23.393030976, 0), x_dir=(1, 0, 0), z_dir=(0, 1, 0)), mode=Mode.PRIVATE) as cut_extrude10_sk2:
        with BuildLine():
            Line((-183.9, -210.4), (-183.9, -201.4))
            Line((-183.9, -201.4), (-177.65, -201.4))
            ThreePointArc((-177.65, -201.4), (-179.064213562, -201.985786438), (-179.65, -203.4))
            Line((-179.65, -203.4), (-179.65, -207.15))
            ThreePointArc((-179.65, -207.15), (-180.601902961, -209.448097039), (-182.9, -210.4))
            Line((-182.9, -210.4), (-183.9, -210.4))
        make_face()
    cut_extrude10_tool2 = split(extrude(cut_extrude10_sk2.sketch, amount=-CUT_EXTRUDE10_REACH, mode=Mode.PRIVATE), bisect_by=cut_extrude10_end, keep=Keep.BOTH, mode=Mode.PRIVATE)
    add(cut_extrude10_tool1.solids().sort_by(Axis((-182.04967, 23.393031, 235.65), (0, -1, 0)))[0], mode=Mode.SUBTRACT)
    add(cut_extrude10_tool2.solids().sort_by(Axis((-181.801157, 23.393031, 205.573356), (0, -1, 0)))[0], mode=Mode.SUBTRACT)

    # Sketch44 → Cut-Extrude12 (cut)
    with BuildSketch(Plane(origin=(0, -6.606969024, 0), x_dir=(1, 0, 0), z_dir=(0, 1, 0))):
        with BuildLine():
            Line((-183.9, -210.4), (-182.9, -210.4))
            ThreePointArc((-182.9, -210.4), (-179.65, -207.15), (-182.9, -203.9))
            Line((-182.9, -203.9), (-183.9, -203.9))
            Line((-183.9, -203.9), (-183.9, -210.4))
        make_face()
        with BuildLine():
            Line((-182.9, -232.4), (-183.9, -232.4))
            Line((-183.9, -232.4), (-183.9, -238.9))
            Line((-183.9, -238.9), (-182.9, -238.9))
            ThreePointArc((-182.9, -238.9), (-179.65, -235.65), (-182.9, -232.4))
        make_face()
    extrude(amount=-CUT_EXTRUDE12_DEPTH, mode=Mode.SUBTRACT)

    # Fillet5
    # the kernel refuses this fillet: 2 mm, written as the material it takes off along each edge
    with BuildSketch(Plane(origin=(-183.9, 34.816323168, 232.4), x_dir=(0, 0, -1), z_dir=(0, -1, 0))) as fillet5_piece_1:
        with BuildLine():
            CenterArc((1.903882032, 2), FILLET5_R, 190.980575428, 79.019424572)
            Line((-0.059501599, 1.619047619), (-0.255839962, 1.580952381))
            ThreePointArc((-0.255839962, 1.580952381), (-0.2, 1), (-0.2, 0))
            Line((-0.2, 0), (0, -0.2))
            Line((0, -0.2), (1.903882032, -0.2))
            Line((1.903882032, -0.2), (1.903882032, 0))
        make_face()
    extrude(amount=62.846584384, mode=Mode.SUBTRACT)
    with BuildSketch(Plane(origin=(-183.9, 26.276030988, 210.4), x_dir=(0.9993253657611183, 0, -0.03672619428156218), z_dir=(0, -1, 0))) as fillet5_piece_2:
        with BuildLine():
            CenterArc((1.92872839, 1.976049997), FILLET5_R, 182.104729259, 79.019424572)
            Line((-0.069922341, 1.902597608), (-0.269787415, 1.895252369))
            Line((-0.269787415, 1.895252369), (-0.199865073, -0.007345239))
            Line((-0.199865073, -0.007345239), (0.007345239, -0.199865073))
            ThreePointArc((0.007345239, -0.199865073), (1.006670605, -0.163138879), (1.589281845, -0.197605))
            Line((1.589281845, -0.197605), (1.620140621, 0))
        make_face()
    extrude(amount=45.766000024, mode=Mode.SUBTRACT)

    # M5 Clearance Hole1
    with Locations(Plane(origin=(0, 0, 201.4), x_dir=(-1, 0, 0), z_dir=(0, 0, -1))):
        with Locations((157.85, 6.393030976)):
            Hole(M5_CLEARANCE_HOLE1_D / 2, depth=M5_CLEARANCE_HOLE1_DEPTH)

    # Sketch45 → Boss-Extrude10 (add)
    with BuildSketch(Plane.XZ.offset(16.606969024).offset(BOSS_EXTRUDE10_START)):
        with BuildLine():
            Line((-165.865738406, 180.821563222), (-181.422087592, 196.377912408))
            ThreePointArc((-181.422087592, 196.377912408), (-184.130463694, 196.377912408), (-184.130463694, 193.669536306))
            Line((-184.130463694, 193.669536306), (-168.574114508, 178.11318712))
            ThreePointArc((-168.574114508, 178.11318712), (-165.865738406, 178.11318712), (-165.865738406, 180.821563222))
        make_face()
        with BuildLine():
            Line((-180.821563222, 165.865738406), (-196.377912408, 181.422087592))
            ThreePointArc((-196.377912408, 181.422087592), (-196.377912408, 184.130463694), (-193.669536306, 184.130463694))
            Line((-193.669536306, 184.130463694), (-178.11318712, 168.574114508))
            ThreePointArc((-178.11318712, 168.574114508), (-178.11318712, 165.865738406), (-180.821563222, 165.865738406))
        make_face()
    extrude(amount=BOSS_EXTRUDE10_DEPTH)


with BuildPart() as body_2_2:
    # Mirror1: mirrored copy
    add(part_1.part.mirror(Plane(origin=(-151.8, 0, 0), x_dir=(0, 0, 1), z_dir=(1, 0, 0))))


solid = body_2_2.part
